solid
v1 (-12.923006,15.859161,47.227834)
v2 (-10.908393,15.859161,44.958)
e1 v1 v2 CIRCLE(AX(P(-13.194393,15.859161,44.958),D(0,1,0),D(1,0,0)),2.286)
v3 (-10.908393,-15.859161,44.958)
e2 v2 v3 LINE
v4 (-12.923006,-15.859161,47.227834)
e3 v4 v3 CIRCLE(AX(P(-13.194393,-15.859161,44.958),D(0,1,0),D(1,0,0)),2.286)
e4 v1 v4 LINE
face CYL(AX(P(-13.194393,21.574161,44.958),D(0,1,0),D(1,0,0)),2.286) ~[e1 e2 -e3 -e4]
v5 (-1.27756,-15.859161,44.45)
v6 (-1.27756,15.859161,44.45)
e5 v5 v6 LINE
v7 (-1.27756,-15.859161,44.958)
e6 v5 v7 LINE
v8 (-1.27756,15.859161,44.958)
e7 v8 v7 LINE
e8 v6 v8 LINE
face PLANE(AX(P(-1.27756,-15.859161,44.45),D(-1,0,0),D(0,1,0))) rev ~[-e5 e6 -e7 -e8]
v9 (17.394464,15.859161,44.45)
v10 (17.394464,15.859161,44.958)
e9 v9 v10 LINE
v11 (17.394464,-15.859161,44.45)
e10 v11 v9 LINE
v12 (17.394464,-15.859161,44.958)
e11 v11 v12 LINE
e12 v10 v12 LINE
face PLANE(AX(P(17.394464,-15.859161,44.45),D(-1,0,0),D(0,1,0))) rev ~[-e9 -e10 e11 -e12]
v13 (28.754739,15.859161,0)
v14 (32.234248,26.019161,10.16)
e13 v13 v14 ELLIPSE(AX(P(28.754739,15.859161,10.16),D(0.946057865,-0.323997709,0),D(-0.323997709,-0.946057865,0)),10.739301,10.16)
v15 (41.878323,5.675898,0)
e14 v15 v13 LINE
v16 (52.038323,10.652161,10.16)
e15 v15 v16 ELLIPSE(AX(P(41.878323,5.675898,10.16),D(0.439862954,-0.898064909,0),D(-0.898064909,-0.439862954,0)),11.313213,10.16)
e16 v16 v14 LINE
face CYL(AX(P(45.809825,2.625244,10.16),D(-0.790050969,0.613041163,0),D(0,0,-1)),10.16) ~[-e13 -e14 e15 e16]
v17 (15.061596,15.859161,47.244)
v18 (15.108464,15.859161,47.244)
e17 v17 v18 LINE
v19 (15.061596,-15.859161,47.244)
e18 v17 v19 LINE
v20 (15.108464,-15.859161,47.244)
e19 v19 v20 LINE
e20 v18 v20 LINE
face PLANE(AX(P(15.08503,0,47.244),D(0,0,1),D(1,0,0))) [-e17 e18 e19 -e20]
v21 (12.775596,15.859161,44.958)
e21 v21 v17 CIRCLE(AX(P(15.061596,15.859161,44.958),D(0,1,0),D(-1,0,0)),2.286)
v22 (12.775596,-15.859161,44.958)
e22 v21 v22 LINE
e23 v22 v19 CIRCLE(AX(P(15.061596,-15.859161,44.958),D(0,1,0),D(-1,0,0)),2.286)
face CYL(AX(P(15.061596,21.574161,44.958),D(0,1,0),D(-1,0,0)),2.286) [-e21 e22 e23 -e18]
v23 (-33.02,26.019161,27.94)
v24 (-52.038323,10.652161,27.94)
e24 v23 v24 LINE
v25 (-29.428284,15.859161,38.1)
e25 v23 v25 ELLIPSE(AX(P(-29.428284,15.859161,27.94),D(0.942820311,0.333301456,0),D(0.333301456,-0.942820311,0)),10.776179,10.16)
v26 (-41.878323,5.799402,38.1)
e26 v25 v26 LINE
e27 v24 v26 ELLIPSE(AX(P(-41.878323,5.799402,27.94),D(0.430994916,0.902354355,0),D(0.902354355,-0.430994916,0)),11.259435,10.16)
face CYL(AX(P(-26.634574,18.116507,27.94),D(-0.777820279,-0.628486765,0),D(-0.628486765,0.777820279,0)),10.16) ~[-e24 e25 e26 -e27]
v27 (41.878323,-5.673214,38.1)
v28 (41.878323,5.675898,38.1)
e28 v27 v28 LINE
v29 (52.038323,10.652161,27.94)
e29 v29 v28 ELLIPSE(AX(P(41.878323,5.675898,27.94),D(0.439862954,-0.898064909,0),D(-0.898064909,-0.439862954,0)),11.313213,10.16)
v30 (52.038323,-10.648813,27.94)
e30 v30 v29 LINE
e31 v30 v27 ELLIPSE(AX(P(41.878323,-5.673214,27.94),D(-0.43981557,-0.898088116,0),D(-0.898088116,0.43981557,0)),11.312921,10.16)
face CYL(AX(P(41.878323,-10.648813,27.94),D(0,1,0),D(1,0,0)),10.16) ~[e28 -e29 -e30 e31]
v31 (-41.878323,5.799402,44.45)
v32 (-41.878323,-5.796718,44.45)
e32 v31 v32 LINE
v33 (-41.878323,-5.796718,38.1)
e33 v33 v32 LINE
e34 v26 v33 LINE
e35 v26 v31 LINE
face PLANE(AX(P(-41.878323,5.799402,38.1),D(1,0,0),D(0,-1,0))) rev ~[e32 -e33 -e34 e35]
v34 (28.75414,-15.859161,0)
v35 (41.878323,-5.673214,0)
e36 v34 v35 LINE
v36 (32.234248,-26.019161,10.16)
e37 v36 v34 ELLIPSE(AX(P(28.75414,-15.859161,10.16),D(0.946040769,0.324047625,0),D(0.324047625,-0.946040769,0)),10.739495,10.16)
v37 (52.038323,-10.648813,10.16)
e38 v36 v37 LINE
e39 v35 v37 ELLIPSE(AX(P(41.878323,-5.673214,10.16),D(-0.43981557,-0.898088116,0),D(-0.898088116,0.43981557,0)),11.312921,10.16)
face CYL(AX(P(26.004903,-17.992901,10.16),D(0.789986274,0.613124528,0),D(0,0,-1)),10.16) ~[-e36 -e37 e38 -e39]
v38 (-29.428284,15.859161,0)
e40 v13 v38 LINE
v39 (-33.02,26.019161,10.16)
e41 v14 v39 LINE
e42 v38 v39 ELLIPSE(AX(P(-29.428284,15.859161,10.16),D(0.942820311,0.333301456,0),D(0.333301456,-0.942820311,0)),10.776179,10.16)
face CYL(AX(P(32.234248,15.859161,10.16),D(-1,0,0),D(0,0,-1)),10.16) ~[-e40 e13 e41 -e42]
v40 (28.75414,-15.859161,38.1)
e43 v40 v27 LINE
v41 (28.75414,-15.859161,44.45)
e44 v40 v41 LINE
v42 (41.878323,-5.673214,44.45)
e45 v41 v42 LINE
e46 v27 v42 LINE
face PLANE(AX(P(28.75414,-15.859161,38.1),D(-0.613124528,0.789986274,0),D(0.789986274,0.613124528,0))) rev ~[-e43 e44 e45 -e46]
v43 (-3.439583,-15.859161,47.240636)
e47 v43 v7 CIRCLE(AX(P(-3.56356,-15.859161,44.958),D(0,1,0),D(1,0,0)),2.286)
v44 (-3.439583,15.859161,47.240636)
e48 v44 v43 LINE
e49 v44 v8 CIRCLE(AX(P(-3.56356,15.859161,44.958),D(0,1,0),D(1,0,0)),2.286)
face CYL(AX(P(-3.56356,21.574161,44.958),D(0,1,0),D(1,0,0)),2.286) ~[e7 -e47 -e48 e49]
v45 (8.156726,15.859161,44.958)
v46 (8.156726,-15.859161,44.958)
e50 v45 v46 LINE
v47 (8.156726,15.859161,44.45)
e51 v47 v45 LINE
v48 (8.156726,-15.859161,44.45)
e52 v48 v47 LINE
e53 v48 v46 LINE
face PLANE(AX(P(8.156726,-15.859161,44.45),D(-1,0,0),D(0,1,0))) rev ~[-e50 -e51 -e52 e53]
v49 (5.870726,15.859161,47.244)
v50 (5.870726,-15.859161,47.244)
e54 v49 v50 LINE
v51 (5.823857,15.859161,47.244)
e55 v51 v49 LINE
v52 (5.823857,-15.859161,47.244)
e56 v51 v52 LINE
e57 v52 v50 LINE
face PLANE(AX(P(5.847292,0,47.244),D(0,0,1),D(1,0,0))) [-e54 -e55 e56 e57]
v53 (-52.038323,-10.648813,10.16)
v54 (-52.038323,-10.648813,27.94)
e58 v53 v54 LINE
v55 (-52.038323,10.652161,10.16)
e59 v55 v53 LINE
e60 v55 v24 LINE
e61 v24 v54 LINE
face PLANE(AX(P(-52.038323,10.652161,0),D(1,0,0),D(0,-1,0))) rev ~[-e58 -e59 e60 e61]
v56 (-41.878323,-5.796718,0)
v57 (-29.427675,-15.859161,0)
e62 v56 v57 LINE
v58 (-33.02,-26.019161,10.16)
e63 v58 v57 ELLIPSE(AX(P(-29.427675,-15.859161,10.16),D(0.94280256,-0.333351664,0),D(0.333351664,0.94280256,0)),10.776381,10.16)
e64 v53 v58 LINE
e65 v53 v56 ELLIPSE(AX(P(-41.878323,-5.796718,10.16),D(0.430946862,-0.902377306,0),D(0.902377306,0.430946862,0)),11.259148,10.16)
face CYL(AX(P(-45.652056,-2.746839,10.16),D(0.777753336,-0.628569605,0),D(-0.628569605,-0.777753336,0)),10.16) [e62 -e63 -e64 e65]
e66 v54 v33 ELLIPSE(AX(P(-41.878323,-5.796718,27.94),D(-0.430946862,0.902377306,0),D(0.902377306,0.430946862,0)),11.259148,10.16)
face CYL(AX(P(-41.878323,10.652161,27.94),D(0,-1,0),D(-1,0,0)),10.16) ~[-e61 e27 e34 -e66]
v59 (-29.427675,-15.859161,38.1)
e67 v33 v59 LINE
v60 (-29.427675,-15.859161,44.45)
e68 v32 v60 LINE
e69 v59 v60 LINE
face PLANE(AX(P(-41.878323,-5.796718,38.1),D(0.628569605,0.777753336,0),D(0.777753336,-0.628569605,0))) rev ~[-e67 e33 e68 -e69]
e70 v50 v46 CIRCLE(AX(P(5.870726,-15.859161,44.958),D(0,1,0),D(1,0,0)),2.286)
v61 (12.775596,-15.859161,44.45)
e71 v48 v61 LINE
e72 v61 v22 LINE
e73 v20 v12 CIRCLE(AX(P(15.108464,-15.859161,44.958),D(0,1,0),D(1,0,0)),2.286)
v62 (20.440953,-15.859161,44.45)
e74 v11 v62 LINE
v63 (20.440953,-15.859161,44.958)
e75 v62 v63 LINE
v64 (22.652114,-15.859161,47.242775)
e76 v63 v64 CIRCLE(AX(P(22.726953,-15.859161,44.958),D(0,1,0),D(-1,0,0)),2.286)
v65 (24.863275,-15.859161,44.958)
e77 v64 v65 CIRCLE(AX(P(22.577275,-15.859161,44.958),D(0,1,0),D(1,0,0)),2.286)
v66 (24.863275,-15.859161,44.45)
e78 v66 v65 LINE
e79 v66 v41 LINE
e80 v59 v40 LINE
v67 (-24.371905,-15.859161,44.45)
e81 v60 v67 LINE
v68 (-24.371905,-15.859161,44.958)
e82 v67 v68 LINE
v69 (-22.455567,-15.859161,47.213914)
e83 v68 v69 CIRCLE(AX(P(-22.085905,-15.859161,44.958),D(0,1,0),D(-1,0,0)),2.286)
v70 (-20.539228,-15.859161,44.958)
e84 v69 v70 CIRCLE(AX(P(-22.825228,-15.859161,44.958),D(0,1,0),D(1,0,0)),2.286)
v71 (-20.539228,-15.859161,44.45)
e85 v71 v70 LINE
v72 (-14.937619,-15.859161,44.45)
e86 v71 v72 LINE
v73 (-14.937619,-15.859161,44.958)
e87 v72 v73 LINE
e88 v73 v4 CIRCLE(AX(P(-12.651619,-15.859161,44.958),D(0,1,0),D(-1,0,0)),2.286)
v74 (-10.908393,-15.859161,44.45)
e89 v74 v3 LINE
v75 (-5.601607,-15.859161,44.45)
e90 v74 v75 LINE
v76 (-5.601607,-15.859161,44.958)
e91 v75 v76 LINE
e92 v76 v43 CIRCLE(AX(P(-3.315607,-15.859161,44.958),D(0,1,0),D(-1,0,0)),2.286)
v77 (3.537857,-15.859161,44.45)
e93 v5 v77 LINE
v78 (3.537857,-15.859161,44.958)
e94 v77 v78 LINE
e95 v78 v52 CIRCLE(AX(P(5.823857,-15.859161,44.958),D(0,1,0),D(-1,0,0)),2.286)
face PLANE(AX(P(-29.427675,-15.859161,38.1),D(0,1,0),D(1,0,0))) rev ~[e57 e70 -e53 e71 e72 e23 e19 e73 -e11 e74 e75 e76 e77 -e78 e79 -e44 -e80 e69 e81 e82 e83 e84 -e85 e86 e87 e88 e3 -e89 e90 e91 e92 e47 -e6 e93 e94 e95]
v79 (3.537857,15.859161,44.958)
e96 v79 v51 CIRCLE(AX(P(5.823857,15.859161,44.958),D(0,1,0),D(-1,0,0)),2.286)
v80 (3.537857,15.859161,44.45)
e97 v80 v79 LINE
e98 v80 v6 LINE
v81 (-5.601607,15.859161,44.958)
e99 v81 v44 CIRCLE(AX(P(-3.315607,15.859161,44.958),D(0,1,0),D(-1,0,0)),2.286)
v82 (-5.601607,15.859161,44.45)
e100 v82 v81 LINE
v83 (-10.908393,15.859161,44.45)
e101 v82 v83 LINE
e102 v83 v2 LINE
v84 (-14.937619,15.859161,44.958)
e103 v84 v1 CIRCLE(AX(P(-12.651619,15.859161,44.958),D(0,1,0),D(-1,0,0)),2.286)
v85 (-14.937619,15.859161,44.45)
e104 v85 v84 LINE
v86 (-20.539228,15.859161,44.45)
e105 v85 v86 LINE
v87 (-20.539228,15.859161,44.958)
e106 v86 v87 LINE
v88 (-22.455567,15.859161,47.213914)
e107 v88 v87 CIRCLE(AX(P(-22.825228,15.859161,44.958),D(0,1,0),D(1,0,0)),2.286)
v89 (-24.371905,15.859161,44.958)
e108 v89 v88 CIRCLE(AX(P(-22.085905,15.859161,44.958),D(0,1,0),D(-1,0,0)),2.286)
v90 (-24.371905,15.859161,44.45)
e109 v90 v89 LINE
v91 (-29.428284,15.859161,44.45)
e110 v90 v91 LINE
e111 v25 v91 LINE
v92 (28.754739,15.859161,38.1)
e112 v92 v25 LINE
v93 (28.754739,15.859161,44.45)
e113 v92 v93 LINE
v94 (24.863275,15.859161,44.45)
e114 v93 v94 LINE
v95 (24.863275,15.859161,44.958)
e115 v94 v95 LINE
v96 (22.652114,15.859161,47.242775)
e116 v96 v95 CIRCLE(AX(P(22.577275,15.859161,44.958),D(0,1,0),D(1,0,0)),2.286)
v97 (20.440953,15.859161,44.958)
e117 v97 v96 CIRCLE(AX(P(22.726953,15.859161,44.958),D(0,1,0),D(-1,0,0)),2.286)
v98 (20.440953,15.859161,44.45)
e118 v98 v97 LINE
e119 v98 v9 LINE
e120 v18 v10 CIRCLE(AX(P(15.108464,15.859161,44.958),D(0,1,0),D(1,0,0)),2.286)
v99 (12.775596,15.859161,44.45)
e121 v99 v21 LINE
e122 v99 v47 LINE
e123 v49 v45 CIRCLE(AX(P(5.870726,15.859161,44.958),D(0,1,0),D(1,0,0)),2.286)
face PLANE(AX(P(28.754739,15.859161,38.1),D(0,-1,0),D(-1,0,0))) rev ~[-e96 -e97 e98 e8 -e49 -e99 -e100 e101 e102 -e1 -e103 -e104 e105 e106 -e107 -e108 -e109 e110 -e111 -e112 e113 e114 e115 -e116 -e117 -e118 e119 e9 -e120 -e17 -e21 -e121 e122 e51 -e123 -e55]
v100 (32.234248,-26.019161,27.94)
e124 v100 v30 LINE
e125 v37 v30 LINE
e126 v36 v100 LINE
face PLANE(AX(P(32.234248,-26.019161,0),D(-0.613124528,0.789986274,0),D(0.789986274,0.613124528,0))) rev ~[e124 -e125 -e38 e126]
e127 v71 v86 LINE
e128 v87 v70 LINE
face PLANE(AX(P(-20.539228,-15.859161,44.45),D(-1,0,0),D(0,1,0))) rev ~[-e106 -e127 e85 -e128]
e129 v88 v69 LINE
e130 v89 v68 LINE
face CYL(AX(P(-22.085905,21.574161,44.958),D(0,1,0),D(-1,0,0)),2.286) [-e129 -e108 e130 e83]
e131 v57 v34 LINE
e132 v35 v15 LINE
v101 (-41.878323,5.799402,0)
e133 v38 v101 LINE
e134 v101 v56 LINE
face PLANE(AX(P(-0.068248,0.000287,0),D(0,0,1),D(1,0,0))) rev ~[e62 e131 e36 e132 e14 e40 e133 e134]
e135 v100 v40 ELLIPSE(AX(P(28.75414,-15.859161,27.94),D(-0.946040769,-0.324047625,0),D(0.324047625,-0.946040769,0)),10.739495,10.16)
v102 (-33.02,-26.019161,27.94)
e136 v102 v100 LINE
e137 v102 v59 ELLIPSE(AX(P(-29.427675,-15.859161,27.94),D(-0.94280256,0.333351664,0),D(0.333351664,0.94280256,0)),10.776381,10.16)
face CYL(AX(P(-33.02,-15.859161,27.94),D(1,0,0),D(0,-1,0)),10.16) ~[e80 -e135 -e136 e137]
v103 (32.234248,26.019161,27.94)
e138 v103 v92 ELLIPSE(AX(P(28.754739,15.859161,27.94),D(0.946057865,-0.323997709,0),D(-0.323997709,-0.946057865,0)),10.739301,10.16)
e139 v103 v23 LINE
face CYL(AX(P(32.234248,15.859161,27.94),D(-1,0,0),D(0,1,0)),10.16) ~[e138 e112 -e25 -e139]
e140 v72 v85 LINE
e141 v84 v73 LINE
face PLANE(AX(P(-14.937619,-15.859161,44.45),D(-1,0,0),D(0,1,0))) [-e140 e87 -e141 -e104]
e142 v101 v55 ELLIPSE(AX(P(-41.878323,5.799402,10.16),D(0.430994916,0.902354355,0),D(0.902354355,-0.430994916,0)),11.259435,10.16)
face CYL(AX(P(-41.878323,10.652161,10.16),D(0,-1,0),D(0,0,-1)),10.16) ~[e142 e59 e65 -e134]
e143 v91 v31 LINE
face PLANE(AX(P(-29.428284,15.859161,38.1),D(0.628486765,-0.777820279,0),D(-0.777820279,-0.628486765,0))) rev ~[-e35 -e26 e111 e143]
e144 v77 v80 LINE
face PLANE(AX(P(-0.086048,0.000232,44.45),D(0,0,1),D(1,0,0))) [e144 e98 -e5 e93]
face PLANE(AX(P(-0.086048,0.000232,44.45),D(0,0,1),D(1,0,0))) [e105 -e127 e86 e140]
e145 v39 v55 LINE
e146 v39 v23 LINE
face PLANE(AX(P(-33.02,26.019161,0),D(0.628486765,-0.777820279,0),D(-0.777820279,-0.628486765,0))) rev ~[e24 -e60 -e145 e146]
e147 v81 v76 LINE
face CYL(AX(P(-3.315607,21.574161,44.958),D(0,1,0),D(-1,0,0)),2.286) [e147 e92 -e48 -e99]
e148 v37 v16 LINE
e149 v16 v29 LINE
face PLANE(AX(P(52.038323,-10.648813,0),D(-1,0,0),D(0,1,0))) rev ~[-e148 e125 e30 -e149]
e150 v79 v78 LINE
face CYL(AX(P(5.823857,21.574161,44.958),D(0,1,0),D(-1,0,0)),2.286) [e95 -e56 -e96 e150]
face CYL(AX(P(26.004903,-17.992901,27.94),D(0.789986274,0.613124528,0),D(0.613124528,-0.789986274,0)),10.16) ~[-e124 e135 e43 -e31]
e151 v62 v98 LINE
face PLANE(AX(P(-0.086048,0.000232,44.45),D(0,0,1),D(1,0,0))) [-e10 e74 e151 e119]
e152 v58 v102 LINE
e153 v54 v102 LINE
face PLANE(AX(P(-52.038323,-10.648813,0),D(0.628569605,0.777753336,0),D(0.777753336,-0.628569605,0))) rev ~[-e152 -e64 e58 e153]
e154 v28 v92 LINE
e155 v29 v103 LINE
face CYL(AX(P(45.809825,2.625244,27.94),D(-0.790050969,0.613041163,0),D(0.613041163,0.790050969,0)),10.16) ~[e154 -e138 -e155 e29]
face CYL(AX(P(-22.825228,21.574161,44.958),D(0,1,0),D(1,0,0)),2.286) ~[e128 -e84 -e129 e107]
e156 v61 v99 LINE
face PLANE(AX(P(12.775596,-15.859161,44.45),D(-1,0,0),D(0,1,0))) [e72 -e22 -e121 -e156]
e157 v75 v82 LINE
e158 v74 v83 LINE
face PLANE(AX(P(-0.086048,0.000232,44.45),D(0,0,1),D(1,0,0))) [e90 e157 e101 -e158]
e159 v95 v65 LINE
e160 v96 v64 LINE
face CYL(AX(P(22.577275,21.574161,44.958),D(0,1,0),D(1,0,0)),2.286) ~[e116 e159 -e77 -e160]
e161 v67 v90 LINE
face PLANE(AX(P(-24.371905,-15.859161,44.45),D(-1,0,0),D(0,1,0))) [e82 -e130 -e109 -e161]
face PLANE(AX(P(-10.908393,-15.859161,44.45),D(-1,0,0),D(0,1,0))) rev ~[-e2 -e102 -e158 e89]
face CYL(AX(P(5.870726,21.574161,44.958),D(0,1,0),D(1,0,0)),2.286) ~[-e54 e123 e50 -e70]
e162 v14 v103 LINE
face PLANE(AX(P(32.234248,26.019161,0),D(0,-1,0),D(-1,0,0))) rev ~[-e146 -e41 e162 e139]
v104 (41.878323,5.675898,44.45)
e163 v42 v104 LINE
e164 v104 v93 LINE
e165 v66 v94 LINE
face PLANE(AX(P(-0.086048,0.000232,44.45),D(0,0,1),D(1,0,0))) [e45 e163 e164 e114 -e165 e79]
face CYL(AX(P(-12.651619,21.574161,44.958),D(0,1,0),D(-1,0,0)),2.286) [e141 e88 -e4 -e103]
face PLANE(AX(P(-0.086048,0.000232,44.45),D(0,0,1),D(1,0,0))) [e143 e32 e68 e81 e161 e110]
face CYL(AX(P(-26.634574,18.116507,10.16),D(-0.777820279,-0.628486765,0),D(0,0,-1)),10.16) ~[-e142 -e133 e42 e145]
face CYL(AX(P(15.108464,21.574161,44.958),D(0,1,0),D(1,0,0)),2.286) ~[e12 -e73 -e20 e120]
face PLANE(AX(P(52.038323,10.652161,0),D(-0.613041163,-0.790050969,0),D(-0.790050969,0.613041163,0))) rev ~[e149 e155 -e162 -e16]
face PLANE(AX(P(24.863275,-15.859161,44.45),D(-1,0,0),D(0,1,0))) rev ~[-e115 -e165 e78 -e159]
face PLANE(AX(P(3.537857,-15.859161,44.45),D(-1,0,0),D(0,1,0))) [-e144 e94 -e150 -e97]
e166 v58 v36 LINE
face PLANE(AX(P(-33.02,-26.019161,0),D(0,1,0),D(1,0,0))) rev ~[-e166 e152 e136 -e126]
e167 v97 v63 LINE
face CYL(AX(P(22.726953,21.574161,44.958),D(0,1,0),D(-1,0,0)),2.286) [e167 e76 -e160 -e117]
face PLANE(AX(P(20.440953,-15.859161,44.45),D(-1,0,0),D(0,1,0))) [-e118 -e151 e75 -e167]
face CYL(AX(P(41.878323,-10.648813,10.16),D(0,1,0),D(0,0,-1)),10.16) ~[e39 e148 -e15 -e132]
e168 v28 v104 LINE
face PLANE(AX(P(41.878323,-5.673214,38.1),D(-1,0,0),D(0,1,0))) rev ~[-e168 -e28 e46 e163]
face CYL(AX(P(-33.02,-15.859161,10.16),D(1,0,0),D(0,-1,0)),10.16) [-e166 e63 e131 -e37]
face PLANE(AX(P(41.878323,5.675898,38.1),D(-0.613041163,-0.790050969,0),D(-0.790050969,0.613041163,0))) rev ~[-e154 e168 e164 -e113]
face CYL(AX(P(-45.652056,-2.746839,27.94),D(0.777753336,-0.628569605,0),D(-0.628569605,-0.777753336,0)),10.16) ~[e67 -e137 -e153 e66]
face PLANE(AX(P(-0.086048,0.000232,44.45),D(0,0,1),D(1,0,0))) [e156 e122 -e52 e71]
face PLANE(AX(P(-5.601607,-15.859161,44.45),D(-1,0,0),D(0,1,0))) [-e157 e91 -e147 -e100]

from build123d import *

# Parameters (mm, degrees)
F1_DEPTH    = 38.1
F2_R        = 10.16
F3_R        = 10.16
F5_DEPTH    = 6.35
F6_W        = 3.8326773793
F6_H        = 31.7183228926
F6_W_2      = 4.029225558
F6_W_3      = 4.3240477098
F6_W_4      = 4.6188691631
F6_W_5      = 4.6188682318
F6_W_6      = 4.4223219156
F7_DEPTH    = 2.794
F8_T1_DEPTH = 43.1483228926


# Not quite as in the source:
# - a fillet or chamfer that OpenCascade refuses, or shapes differently, is made with other operations: its cross-section is extruded or revolved along the edge and cut away or added


with BuildPart() as f1:
    # F0 (on Top) → F1 (new body)
    with BuildSketch(Plane.XY):
        Polygon((-33.02, -26.0191614463), (32.2342477739, -26.0191614463), (52.0383228926, -10.6488130987), (52.0383228926, 10.6521614463), (32.2342477739, 26.0191614463), (-33.02, 26.0191614463), (-52.0383228926, 10.6521614463), (-52.0383228926, -10.6488130987), align=None)
    extrude(amount=F1_DEPTH)

    # F2
    f2_edges = [f1.edges().sort_by_distance(p)[0] for p in [
        (-0.392876, -26.019161, 38.1),
        (-42.529161, -18.333987, 38.1),
        (-52.038323, 0.001674, 38.1),
        (-42.529161, 18.335661, 38.1),
        (-0.392876, 26.019161, 38.1),
        (42.136285, 18.335661, 38.1),
        (52.038323, 0.001674, 38.1),
        (42.136285, -18.333987, 38.1),
    ]]
    fillet(f2_edges, radius=F2_R)

    # F3
    f3_edges = [f1.edges().sort_by_distance(p)[0] for p in [
        (-0.392876, -26.019161, 0),
        (-42.529161, -18.333987, 0),
        (-52.038323, 0.001674, 0),
        (-42.529161, 18.335661, 0),
        (-0.392876, 26.019161, 0),
        (42.136285, 18.335661, 0),
        (52.038323, 0.001674, 0),
        (42.136285, -18.333987, 0),
    ]]
    fillet(f3_edges, radius=F3_R)

    # F4 (on face) → F5 (join)
    with BuildSketch(Plane.XY.offset(38.1)):
        Polygon((-29.4282840059, 15.8591614463), (-41.8783228926, 5.7994023049), (-41.8783228926, -5.7967184312), (-29.4276753196, -15.8591614463), (28.7541399654, -15.8591614463), (41.8783228926, -5.6732142531), (41.8783228926, 5.6758979589), (28.7547389102, 15.8591614463), align=None)
    extrude(amount=F5_DEPTH)

    # F6 (on face) → F7 (join)
    with BuildSketch(Plane.XY.offset(44.45)):
        with Locations((-22.4555665627, 0)):
            Rectangle(F6_W, F6_H)
        with Locations((-12.9230059683, 0)):
            Rectangle(F6_W_2, F6_H)
        with Locations((-3.4395834082, 0)):
            Rectangle(F6_W_3, F6_H)
        with Locations((5.8472915553, 0)):
            Rectangle(F6_W_4, F6_H)
        with Locations((15.0850303471, 0)):
            Rectangle(F6_W_5, F6_H)
        with Locations((22.6521138102, 0)):
            Rectangle(F6_W_6, F6_H)
    extrude(amount=F7_DEPTH)

    # F8: fillet of radius 2.286 on 12 edges, made by hand

    # F8_s2 → F8_t1 (cut)
    with BuildSketch(Plane.XZ.offset(-21.5741614463)):
        with BuildLine():
            ThreePointArc((-20.5392278731, 44.958), (-21.2087817713, 46.5744461018), (-22.8252278731, 47.244))
            Line((-22.8252278731, 47.244), (-20.5392278731, 47.244))
            Line((-20.5392278731, 47.244), (-20.5392278731, 44.958))
        make_face()
        with BuildLine():
            ThreePointArc((-10.9083931893, 44.958), (-11.5779470875, 46.5744461018), (-13.1943931893, 47.244))
            Line((-13.1943931893, 47.244), (-10.9083931893, 47.244))
            Line((-10.9083931893, 47.244), (-10.9083931893, 44.958))
        make_face()
        with BuildLine():
            ThreePointArc((-1.2775595533, 44.958), (-1.9471134515, 46.5744461018), (-3.5635595533, 47.244))
            Line((-3.5635595533, 47.244), (-1.2775595533, 47.244))
            Line((-1.2775595533, 47.244), (-1.2775595533, 44.958))
        make_face()
        with BuildLine():
            ThreePointArc((8.1567261368, 44.958), (7.4871722386, 46.5744461018), (5.8707261368, 47.244))
            Line((5.8707261368, 47.244), (8.1567261368, 47.244))
            Line((8.1567261368, 47.244), (8.1567261368, 44.958))
        make_face()
        with BuildLine():
            ThreePointArc((17.394464463, 44.958), (16.7249105648, 46.5744461018), (15.108464463, 47.244))
            Line((15.108464463, 47.244), (17.394464463, 47.244))
            Line((17.394464463, 47.244), (17.394464463, 44.958))
        make_face()
        with BuildLine():
            ThreePointArc((24.863274768, 44.958), (24.1937208698, 46.5744461018), (22.577274768, 47.244))
            Line((22.577274768, 47.244), (24.863274768, 47.244))
            Line((24.863274768, 47.244), (24.863274768, 44.958))
        make_face()
        with BuildLine():
            ThreePointArc((20.4409528524, 44.958), (21.1105067506, 46.5744461018), (22.7269528524, 47.244))
            Line((22.7269528524, 47.244), (20.4409528524, 47.244))
            Line((20.4409528524, 47.244), (20.4409528524, 44.958))
        make_face()
        with BuildLine():
            ThreePointArc((12.7755962312, 44.958), (13.4451501294, 46.5744461018), (15.0615962312, 47.244))
            Line((15.0615962312, 47.244), (12.7755962312, 47.244))
            Line((12.7755962312, 47.244), (12.7755962312, 44.958))
        make_face()
        with BuildLine():
            ThreePointArc((3.5378569737, 44.958), (4.2074108719, 46.5744461018), (5.8238569737, 47.244))
            Line((5.8238569737, 47.244), (3.5378569737, 47.244))
            Line((3.5378569737, 47.244), (3.5378569737, 44.958))
        make_face()
        with BuildLine():
            ThreePointArc((-5.6016072631, 44.958), (-4.9320533649, 46.5744461018), (-3.3156072631, 47.244))
            Line((-3.3156072631, 47.244), (-5.6016072631, 47.244))
            Line((-5.6016072631, 47.244), (-5.6016072631, 44.958))
        make_face()
        with BuildLine():
            ThreePointArc((-14.9376187474, 44.958), (-14.2680648491, 46.5744461018), (-12.6516187474, 47.244))
            Line((-12.6516187474, 47.244), (-14.9376187474, 47.244))
            Line((-14.9376187474, 47.244), (-14.9376187474, 44.958))
        make_face()
        with BuildLine():
            ThreePointArc((-24.3719052523, 44.958), (-23.7023513541, 46.5744461018), (-22.0859052523, 47.244))
            Line((-22.0859052523, 47.244), (-24.3719052523, 47.244))
            Line((-24.3719052523, 47.244), (-24.3719052523, 44.958))
        make_face()
    extrude(amount=F8_T1_DEPTH, mode=Mode.SUBTRACT)


solid = f1.part
